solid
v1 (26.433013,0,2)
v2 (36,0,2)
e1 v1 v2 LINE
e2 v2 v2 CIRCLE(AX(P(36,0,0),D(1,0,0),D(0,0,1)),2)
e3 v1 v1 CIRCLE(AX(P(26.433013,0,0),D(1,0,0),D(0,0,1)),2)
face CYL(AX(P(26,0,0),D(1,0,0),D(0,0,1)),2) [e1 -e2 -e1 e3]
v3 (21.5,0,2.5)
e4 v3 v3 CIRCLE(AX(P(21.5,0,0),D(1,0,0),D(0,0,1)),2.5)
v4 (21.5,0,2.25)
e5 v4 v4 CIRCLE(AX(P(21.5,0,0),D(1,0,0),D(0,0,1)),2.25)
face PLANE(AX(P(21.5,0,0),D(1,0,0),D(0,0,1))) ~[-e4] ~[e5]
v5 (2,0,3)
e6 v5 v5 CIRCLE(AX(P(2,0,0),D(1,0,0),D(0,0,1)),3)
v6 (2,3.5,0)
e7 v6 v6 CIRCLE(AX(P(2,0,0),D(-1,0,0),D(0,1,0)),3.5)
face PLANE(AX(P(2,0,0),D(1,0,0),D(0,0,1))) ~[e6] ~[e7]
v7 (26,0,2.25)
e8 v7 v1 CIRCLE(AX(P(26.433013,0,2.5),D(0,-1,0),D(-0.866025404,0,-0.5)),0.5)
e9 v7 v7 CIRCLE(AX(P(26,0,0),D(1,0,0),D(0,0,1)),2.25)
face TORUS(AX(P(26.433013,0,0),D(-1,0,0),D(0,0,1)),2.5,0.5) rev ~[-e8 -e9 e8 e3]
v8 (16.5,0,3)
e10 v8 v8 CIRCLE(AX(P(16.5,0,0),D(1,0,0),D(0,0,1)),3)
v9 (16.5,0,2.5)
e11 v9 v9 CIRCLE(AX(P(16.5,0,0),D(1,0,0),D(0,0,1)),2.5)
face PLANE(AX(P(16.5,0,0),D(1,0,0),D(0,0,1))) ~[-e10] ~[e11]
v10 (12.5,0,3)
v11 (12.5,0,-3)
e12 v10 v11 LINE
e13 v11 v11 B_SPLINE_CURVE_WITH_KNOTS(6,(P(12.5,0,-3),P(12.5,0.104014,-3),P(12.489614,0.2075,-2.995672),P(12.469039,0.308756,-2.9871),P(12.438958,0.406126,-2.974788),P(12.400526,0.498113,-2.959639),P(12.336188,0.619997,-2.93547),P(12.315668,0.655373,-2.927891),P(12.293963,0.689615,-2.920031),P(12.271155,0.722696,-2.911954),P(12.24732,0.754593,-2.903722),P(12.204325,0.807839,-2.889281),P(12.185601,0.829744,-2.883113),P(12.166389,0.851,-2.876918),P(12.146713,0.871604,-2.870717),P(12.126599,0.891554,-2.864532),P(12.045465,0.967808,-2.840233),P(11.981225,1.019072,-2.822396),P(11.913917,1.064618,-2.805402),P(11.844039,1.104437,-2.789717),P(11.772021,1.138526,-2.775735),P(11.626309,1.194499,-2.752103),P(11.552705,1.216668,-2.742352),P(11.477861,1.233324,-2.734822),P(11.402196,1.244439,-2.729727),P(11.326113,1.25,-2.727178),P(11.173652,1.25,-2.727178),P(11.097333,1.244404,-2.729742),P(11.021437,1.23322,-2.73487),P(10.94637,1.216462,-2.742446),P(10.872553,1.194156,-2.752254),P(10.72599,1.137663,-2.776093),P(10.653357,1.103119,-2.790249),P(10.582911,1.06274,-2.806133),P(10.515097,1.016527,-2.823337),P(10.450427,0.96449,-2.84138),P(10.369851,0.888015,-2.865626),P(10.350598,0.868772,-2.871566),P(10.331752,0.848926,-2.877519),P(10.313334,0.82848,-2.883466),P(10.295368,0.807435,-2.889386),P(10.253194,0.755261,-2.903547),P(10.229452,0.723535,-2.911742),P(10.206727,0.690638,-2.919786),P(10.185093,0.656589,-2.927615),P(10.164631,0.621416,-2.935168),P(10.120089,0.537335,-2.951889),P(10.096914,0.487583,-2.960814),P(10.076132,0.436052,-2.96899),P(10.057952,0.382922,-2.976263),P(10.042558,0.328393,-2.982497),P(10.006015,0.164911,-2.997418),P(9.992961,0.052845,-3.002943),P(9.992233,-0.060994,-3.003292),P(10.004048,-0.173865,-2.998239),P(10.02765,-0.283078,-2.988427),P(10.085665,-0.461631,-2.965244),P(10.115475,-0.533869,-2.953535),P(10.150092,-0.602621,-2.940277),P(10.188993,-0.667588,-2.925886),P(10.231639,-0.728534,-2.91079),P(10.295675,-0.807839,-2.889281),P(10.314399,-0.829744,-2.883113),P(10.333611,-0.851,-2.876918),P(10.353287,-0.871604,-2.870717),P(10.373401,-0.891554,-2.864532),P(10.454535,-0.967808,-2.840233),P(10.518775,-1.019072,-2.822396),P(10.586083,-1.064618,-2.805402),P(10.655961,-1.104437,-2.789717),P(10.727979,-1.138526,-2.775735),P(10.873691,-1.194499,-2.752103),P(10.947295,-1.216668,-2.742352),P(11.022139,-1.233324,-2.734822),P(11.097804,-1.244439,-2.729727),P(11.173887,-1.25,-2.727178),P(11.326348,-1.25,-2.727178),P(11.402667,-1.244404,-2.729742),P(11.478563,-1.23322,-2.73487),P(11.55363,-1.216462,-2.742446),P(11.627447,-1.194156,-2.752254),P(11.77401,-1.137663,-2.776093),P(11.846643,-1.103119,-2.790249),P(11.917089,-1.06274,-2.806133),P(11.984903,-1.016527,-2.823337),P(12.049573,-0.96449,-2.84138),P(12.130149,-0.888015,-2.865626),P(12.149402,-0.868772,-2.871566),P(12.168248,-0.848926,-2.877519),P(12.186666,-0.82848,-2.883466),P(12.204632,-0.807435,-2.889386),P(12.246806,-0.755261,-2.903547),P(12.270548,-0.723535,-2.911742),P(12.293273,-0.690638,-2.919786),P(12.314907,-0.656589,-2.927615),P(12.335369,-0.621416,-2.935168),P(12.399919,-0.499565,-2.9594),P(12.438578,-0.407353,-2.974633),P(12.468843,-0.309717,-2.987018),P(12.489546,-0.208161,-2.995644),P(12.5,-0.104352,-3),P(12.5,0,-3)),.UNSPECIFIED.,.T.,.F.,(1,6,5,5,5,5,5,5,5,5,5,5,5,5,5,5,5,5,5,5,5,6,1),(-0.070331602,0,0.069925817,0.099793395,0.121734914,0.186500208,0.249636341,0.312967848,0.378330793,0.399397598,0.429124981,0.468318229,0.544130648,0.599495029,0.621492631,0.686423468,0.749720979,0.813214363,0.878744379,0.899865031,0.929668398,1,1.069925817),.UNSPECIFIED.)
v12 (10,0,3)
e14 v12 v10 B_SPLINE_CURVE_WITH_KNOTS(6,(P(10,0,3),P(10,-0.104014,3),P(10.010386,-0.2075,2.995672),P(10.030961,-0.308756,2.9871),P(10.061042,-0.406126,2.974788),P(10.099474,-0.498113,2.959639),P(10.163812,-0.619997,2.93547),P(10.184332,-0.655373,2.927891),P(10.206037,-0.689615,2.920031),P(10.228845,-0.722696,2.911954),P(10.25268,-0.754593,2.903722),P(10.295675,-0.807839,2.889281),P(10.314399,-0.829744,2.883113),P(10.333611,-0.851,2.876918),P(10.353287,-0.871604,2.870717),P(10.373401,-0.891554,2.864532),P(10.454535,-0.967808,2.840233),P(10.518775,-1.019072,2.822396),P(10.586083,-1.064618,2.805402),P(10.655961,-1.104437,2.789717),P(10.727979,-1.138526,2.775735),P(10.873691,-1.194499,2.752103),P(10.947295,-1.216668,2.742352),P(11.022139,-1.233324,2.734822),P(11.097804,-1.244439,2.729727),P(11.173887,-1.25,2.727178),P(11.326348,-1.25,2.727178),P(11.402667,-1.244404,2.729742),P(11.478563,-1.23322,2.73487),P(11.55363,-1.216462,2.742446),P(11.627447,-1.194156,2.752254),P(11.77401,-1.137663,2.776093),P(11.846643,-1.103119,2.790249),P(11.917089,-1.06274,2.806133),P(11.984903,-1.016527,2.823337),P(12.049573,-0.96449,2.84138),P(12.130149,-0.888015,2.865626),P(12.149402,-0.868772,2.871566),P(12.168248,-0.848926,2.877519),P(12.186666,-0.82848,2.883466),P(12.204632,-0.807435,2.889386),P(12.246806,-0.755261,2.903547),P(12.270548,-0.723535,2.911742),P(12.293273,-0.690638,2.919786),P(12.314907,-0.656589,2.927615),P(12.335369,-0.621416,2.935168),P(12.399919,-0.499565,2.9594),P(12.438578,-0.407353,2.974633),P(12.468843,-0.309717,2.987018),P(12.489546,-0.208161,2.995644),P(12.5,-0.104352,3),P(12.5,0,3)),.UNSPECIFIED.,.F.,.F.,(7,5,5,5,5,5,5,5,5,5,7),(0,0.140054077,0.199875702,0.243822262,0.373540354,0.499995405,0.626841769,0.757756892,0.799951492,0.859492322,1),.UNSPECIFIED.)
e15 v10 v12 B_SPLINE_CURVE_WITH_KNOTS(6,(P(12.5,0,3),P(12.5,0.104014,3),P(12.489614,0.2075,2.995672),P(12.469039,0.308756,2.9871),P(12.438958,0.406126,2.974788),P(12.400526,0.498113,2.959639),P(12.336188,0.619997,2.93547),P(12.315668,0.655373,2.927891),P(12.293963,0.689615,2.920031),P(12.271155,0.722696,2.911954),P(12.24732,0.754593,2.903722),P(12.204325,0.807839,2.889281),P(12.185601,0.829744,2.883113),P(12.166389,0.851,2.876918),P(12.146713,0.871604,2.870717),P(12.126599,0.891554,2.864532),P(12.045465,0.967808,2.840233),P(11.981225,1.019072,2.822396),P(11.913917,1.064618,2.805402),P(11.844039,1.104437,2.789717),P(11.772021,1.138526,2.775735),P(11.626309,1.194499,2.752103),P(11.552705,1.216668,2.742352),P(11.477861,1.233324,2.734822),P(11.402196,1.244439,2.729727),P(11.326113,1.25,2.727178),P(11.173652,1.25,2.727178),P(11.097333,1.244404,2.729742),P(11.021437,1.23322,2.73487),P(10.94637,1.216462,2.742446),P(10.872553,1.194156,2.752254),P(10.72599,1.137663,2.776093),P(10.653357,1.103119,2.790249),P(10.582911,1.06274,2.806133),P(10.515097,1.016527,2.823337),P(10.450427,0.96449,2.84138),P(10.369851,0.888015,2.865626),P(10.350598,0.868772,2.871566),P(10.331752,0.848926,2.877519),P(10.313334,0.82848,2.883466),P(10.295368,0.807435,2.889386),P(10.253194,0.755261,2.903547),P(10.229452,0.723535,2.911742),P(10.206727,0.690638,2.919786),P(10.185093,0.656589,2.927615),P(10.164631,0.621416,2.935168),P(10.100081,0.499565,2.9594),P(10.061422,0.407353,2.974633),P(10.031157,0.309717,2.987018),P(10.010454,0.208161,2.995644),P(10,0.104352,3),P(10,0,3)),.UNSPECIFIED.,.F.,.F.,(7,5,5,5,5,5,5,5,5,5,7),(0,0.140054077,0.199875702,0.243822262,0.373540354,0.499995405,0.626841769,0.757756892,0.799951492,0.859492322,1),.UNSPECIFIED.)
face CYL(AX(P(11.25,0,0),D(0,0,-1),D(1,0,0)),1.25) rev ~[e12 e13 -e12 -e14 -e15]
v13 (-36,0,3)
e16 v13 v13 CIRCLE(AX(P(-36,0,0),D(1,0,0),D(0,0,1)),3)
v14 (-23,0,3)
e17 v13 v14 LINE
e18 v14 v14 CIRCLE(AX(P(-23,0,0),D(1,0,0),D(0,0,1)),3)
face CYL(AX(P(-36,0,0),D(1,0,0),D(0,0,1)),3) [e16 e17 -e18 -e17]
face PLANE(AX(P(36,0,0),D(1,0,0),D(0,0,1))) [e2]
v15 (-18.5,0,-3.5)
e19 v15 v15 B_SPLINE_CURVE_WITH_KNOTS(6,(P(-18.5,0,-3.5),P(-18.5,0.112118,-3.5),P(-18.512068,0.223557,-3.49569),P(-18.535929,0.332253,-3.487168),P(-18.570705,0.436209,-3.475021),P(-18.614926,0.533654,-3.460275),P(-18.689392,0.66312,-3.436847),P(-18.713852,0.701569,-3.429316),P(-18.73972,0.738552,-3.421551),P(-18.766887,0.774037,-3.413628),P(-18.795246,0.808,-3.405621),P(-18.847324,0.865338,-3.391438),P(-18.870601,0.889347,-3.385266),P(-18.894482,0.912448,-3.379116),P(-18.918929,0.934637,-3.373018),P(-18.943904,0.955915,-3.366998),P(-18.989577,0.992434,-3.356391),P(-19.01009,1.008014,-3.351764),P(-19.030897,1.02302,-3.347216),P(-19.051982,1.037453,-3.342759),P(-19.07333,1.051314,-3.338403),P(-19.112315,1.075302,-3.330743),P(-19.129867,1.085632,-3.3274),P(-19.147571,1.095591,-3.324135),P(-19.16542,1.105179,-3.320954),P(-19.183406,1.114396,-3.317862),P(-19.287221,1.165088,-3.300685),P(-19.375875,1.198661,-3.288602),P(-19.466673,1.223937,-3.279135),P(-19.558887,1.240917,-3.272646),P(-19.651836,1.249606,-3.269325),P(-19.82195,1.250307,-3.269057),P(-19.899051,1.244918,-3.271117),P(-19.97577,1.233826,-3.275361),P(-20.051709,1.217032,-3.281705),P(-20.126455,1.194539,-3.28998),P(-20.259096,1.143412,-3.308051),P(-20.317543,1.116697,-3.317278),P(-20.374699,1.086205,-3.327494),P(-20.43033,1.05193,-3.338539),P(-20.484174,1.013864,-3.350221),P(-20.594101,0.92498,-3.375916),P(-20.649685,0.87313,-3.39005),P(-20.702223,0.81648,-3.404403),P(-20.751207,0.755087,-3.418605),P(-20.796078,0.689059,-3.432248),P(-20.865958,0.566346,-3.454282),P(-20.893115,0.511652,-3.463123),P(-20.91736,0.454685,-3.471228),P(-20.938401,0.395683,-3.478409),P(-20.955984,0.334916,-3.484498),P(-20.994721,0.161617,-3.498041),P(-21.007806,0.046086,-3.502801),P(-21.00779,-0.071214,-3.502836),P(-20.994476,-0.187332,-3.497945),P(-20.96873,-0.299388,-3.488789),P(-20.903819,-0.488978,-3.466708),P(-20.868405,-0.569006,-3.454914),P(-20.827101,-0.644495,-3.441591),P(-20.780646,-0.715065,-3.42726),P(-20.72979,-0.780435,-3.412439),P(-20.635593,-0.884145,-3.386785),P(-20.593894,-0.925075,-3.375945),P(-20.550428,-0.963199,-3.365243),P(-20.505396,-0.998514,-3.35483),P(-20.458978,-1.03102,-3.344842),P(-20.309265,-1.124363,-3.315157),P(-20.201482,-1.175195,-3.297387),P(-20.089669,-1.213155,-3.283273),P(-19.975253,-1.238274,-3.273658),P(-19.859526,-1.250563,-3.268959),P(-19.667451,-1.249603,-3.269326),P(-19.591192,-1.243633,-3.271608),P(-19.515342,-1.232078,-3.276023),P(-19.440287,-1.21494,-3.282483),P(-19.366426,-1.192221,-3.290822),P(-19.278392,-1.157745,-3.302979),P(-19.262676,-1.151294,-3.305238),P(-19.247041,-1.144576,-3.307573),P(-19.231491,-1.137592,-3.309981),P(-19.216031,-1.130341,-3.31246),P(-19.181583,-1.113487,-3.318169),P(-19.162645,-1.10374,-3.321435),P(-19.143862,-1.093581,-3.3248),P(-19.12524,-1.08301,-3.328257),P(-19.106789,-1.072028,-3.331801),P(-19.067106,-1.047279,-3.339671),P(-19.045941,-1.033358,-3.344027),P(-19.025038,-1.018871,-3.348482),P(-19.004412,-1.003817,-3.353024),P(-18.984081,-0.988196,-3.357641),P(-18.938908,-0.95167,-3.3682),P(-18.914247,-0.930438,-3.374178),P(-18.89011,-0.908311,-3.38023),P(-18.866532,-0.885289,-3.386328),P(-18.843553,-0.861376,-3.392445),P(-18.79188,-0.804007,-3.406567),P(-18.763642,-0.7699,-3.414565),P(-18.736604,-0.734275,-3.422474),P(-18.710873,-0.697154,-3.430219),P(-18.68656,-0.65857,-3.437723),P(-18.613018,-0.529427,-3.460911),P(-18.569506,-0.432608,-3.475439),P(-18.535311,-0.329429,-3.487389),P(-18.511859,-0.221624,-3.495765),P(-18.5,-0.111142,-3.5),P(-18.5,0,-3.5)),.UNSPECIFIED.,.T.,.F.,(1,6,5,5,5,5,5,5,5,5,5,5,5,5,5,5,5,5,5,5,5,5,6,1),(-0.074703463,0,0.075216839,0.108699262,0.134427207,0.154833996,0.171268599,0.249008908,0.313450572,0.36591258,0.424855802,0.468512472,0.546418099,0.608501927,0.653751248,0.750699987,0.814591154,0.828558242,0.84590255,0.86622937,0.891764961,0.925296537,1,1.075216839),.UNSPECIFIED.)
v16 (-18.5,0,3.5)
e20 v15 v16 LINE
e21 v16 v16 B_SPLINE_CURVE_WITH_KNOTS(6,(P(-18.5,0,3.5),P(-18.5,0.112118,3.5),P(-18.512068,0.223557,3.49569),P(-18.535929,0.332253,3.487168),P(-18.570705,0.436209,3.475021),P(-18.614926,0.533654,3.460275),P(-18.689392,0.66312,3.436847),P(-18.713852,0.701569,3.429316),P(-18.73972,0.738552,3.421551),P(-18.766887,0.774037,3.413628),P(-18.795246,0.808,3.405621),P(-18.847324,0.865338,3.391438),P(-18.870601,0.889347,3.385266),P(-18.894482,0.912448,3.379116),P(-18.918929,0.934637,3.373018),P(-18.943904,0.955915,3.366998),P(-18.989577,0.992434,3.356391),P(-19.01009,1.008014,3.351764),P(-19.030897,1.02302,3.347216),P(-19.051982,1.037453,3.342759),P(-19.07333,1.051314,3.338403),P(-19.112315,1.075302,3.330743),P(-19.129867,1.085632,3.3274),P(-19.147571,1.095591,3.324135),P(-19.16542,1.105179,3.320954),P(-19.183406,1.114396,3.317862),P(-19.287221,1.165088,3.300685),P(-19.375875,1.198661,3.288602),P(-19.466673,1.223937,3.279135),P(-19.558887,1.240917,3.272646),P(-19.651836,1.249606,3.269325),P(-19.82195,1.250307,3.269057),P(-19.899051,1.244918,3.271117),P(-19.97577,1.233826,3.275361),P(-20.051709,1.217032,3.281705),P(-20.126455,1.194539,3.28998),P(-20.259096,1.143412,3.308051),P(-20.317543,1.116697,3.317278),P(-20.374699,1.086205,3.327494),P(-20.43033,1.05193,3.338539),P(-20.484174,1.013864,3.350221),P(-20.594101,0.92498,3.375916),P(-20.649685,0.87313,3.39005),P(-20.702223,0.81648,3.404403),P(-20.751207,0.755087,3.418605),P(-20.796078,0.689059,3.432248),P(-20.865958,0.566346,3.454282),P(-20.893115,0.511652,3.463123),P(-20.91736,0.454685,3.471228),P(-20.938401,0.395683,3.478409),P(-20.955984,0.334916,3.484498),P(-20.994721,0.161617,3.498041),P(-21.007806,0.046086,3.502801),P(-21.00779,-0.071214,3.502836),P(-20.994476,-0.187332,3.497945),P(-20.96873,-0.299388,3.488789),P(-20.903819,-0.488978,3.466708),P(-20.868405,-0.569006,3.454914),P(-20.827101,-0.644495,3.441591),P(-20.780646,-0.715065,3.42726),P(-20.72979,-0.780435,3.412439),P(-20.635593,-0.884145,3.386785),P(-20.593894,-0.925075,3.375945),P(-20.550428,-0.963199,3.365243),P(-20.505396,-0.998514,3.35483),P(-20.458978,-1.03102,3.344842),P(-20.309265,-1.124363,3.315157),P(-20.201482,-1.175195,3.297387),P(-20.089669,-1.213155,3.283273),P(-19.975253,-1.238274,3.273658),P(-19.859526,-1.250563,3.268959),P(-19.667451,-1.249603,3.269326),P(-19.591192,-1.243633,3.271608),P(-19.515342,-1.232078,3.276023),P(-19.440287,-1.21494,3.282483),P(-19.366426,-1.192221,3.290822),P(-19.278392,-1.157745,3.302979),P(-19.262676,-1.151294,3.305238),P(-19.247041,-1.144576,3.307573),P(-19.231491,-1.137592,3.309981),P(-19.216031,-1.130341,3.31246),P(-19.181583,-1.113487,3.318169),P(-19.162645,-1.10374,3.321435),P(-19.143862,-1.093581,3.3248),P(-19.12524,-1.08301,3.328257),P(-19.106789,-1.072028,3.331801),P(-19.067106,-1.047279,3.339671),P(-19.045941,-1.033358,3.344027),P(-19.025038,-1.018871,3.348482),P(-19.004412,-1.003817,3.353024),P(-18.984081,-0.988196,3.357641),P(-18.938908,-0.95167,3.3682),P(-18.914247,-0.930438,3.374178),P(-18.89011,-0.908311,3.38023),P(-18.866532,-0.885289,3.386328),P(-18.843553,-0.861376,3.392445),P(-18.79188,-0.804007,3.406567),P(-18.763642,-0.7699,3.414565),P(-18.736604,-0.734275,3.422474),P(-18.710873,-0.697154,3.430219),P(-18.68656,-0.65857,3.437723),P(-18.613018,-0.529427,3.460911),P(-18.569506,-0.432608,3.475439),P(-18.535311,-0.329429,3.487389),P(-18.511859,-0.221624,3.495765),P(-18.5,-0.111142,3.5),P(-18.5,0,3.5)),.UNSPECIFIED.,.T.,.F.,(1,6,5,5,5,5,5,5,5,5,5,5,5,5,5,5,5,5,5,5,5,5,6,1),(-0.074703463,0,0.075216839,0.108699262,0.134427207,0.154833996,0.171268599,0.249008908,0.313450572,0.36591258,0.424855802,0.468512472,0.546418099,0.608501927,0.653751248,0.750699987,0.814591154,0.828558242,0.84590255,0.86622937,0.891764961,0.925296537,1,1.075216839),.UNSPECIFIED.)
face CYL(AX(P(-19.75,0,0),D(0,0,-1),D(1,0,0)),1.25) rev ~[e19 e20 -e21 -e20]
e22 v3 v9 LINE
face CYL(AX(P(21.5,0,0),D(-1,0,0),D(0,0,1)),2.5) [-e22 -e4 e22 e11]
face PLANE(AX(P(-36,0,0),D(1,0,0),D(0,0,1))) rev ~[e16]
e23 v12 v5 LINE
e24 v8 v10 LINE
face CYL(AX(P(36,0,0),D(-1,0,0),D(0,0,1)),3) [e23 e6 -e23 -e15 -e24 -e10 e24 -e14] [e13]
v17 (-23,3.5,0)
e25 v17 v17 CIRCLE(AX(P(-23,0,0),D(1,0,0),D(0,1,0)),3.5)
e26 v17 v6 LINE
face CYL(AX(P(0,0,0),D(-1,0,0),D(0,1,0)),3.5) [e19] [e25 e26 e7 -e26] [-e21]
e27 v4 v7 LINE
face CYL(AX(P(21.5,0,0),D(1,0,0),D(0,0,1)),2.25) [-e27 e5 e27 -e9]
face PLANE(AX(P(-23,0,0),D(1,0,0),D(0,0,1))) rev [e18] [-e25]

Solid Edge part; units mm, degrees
sketch "Sketch1" plane through (0, 0, 0) normal (1, 0, 0) x (0, 1, 0)
  circle A0 centre (0, 0) radius 3.5
  dimension "D1" = 7
extrude "Protrusion1" add sketch "Sketch1" along normal mid plane 72
sketch "Sketch2" plane through (0, 0, 0) normal (0, -1, 0) x (1, 0, 0)
  line L0 (-36, 3) -> (-23, 3)
  line L1 (-23, 3) -> (-23, 3.5)
  dimension "D1" = 13
revolve "RevolvedCutout1" cut sketch "Sketch2" angle 360 about axis through (-60, 0, 0) along (1, 0, 0) material side at (-29.5, 0, 3.05)
sketch "Sketch3" plane through (0, 0, 0) normal (0, -1, 0) x (1, 0, 0)
  line L0 (36, 3) -> (2, 3)
  line L1 (2, 3) -> (2, 3.5)
  dimension "D1" = 34
revolve "RevolvedCutout2" cut sketch "Sketch3" angle 360 about axis through (-60, 0, 0) along (1, 0, 0) material side at (19, 0, 3.05)
sketch "Sketch4" plane through (0, 0, 0) normal (0, -1, 0) x (1, 0, 0)
  line L0 (16.5, 2.5) -> (16.5, 3)
  line L1 (21.5, 2.5) -> (16.5, 2.5)
  line L2 (21.5, 2.25) -> (21.5, 2.5)
  line L3 (21.5, 2.25) -> (26, 2.25)
  line L4 (26, 2.25) -> (26, 2)
  line L5 (26, 2) -> (36, 2)
  dimension "D1" = 19.5
  dimension "D2" = 14.5
  dimension "D3" = 10
revolve "RevolvedCutout3" cut sketch "Sketch4" angle 360 about axis through (-60, 0, 0) along (1, 0, 0) material side at (16.55, 0, 2.75)
cosmetic_thread "Gewinde_1" size "M4" thread depth 9.5
fillet "Verrundung_2" radius 0.5 1 edges at (26, 0, -2)
sketch "Sketch5" plane through (0, 0, 0) normal (0, 0, 1) x (1, 0, 0)
  circle A0 centre (-19.75, 0) radius 1.25
  dimension "D1" = 2.5
  dimension "D2" = 15
extrude "Cutout1" cut sketch "Sketch5" along normal up to next and the other way up to next
sketch "Sketch6" plane through (0, 0, 0) normal (0, 0, 1) x (1, 0, 0)
  circle A0 centre (11.25, 0) radius 1.25
  dimension "D1" = 46
extrude "Cutout2" cut sketch "Sketch6" along normal up to next and the other way up to next
properties material "Stahl - Unlegierter:1.1191 , C45E"
